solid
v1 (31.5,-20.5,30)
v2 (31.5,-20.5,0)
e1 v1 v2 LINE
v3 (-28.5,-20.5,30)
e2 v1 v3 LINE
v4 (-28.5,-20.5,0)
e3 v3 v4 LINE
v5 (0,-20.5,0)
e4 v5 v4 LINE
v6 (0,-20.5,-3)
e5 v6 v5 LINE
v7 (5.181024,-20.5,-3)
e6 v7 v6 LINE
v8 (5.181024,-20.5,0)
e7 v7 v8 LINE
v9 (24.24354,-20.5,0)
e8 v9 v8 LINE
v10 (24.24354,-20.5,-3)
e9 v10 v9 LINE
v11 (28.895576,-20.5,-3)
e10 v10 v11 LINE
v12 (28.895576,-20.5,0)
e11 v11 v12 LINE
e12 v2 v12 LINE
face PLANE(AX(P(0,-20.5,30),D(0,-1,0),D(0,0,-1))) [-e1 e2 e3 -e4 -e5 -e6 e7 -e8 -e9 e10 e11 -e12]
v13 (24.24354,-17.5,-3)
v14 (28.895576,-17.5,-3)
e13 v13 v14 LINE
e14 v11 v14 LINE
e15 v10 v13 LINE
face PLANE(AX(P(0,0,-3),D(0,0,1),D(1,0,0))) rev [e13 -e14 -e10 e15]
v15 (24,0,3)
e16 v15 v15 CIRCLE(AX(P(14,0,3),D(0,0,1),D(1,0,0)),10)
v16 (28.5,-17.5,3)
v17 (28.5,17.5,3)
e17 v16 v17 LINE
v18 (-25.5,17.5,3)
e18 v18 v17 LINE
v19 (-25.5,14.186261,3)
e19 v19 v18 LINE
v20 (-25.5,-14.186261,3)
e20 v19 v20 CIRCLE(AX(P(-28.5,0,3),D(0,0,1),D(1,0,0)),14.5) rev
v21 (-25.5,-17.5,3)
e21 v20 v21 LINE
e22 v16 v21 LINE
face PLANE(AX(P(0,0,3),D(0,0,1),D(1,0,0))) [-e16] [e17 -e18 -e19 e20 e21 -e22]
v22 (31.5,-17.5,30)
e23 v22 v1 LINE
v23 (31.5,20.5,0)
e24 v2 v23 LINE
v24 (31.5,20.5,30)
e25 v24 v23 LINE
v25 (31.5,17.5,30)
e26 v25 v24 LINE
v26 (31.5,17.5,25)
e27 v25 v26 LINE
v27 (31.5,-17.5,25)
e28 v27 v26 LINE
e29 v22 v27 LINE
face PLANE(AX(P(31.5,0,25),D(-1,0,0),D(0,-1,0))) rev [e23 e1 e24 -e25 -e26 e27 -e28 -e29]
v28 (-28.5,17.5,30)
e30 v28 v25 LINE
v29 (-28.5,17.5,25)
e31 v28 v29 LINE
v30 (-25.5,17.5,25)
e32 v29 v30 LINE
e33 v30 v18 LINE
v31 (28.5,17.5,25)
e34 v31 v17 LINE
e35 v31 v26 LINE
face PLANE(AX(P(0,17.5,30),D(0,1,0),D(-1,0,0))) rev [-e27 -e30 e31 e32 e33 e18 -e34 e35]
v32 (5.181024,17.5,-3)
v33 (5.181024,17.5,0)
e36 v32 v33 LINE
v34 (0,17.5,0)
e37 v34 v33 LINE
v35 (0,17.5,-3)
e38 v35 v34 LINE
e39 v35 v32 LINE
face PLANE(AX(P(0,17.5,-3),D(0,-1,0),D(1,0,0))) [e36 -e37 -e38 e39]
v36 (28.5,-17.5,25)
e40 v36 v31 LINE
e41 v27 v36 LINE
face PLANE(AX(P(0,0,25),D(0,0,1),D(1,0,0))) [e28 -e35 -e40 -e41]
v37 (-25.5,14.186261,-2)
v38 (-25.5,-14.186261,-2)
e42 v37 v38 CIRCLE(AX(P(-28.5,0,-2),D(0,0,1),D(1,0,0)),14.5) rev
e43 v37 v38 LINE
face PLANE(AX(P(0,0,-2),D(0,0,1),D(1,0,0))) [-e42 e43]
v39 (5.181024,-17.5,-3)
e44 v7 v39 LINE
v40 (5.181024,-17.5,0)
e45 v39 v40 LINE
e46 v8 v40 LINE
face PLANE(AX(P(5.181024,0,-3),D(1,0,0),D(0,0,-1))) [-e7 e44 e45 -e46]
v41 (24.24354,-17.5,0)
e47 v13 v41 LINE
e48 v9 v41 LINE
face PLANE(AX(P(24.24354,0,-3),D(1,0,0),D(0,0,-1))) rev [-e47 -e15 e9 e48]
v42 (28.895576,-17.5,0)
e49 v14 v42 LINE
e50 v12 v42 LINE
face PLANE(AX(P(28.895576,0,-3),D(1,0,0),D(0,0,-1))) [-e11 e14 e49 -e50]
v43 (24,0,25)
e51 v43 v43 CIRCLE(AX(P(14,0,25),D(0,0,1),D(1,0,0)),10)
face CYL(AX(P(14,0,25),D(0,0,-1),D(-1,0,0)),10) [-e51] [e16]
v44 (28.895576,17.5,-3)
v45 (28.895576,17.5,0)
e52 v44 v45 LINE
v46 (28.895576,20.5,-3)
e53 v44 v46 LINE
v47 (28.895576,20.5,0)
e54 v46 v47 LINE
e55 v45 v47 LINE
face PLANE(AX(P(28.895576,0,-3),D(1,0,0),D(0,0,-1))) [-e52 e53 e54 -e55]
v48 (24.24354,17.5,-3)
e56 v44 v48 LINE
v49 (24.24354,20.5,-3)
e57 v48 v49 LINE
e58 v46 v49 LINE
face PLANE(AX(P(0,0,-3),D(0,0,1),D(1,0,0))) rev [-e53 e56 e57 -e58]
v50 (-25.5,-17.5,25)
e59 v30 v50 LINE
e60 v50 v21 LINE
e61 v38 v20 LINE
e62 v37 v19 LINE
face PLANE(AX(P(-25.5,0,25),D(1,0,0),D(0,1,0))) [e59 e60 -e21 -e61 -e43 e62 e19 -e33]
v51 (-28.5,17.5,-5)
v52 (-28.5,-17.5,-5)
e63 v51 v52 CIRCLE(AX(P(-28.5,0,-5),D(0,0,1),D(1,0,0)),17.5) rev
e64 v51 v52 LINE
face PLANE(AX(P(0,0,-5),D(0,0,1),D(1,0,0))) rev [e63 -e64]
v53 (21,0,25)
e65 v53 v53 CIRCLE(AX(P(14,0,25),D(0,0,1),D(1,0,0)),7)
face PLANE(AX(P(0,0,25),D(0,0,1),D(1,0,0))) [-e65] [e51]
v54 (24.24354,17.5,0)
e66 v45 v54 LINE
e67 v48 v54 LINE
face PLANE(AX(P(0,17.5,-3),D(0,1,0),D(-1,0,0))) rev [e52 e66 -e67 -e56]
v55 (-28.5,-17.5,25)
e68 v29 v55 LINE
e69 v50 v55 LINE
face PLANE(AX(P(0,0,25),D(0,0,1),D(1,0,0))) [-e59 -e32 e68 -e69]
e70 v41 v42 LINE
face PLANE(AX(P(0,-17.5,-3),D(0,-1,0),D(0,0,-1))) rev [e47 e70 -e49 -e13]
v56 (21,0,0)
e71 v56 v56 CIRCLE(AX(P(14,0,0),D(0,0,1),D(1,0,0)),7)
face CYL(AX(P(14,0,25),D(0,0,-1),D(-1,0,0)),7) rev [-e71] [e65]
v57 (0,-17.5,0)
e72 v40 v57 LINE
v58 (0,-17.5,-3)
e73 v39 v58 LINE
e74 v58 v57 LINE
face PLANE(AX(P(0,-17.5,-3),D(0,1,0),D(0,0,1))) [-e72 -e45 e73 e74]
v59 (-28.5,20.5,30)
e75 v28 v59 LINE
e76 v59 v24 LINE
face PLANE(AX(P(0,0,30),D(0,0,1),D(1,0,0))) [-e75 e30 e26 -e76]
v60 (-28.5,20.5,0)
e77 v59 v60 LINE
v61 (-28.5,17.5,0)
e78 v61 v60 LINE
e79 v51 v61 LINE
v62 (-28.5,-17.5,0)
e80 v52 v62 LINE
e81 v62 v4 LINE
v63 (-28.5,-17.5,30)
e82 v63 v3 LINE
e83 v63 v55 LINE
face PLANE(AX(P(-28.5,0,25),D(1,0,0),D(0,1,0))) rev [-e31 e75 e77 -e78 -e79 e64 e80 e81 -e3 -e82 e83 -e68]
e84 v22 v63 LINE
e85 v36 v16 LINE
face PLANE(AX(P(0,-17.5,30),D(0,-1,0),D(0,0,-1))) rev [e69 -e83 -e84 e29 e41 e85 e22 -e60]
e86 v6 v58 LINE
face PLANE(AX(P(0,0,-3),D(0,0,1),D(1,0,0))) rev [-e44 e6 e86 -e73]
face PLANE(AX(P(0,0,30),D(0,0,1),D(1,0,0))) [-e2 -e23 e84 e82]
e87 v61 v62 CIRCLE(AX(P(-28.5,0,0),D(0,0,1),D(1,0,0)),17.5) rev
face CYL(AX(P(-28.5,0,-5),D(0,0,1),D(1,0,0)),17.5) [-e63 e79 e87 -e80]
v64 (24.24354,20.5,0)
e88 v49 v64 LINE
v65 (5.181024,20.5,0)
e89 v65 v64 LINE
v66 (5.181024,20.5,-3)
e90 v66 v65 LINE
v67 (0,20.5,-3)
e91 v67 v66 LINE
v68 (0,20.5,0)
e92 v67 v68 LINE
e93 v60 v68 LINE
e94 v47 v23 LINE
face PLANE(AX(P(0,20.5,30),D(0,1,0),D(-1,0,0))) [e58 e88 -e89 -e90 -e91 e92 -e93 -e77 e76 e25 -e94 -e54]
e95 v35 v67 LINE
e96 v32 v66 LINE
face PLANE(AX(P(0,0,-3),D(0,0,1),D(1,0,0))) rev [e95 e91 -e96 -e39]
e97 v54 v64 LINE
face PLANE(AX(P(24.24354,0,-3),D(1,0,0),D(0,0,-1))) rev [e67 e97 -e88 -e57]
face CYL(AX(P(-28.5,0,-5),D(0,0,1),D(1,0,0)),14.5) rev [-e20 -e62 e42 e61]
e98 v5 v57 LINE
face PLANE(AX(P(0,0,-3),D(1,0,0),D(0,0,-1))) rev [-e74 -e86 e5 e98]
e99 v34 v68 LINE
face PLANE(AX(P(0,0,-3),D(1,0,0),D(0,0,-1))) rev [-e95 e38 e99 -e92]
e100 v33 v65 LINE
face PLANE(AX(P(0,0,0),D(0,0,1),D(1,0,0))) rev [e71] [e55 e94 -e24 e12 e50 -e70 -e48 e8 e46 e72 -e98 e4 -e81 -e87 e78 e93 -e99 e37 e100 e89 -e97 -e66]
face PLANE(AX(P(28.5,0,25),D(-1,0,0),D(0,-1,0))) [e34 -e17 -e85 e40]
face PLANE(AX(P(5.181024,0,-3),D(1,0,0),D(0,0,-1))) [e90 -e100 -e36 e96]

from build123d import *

# Parameters (mm, degrees)
SKETCH1_R           = 7
BOSS_EXTRUDE1_DEPTH = 25
BOSS_EXTRUDE2_DEPTH = 5
SKETCH1_4_W         = 60
SKETCH1_4_H         = 3
BOSS_EXTRUDE3_DEPTH = 30
SKETCH1_5_W         = 5.181024341
SKETCH1_5_H         = 3
SKETCH1_5_W_2       = 4.652035809
BOSS_EXTRUDE4_DEPTH = 3
SHELL2_START        = 3
SHELL2_OUTLINE_W    = 54
SHELL2_OUTLINE_H    = 35
SHELL2_OUTLINE_R    = 10
SHELL2_DEPTH        = 22
SHELL2_START_2      = -2
SHELL2_2_DEPTH      = 5


# Read off the part's stored shape, not the designer's step: Shell2
with BuildPart() as part:
    # Sketch1 → Boss-Extrude1 (new body)
    # profile 1 of 2: a face of its own
    with BuildSketch(Plane.XY):
        with BuildLine():
            Line((-28.5, 17.5), (14, 17.5))
            Line((14, 17.5), (31.5, 17.5))
            Line((31.5, 17.5), (31.5, -17.5))
            Line((31.5, -17.5), (14, -17.5))
            Line((14, -17.5), (-28.5, -17.5))
            ThreePointArc((-28.5, -17.5), (-11, 0), (-28.5, 17.5))
        make_face()
        with Locations((14, 0)):
            Circle(SKETCH1_R, mode=Mode.SUBTRACT)
    # profile 2 of 2: a face of its own
    with BuildSketch(Plane.XY):
        with BuildLine():
            ThreePointArc((-28.5, 17.5), (-11, 0), (-28.5, -17.5))
            Line((-28.5, -17.5), (-28.5, 17.5))
        make_face()
    extrude(amount=BOSS_EXTRUDE1_DEPTH)

    # Sketch1<3> → Boss-Extrude2 (add)
    with BuildSketch(Plane.XY):
        with BuildLine():
            ThreePointArc((-28.5, 17.5), (-11, 0), (-28.5, -17.5))
            Line((-28.5, -17.5), (-28.5, 17.5))
        make_face()
    extrude(amount=-BOSS_EXTRUDE2_DEPTH)

    # Sketch1<4> → Boss-Extrude3 (add)
    with BuildSketch(Plane.XY):
        with Locations((1.5, 19)):
            Rectangle(SKETCH1_4_W, SKETCH1_4_H)
        with Locations((1.5, -19)):
            Rectangle(SKETCH1_4_W, SKETCH1_4_H)
    extrude(amount=BOSS_EXTRUDE3_DEPTH)

    # Sketch1<5> → Boss-Extrude4 (add)
    with BuildSketch(Plane.XY):
        with Locations((2.590512171, 19)):
            Rectangle(SKETCH1_5_W, SKETCH1_5_H)
        with Locations((2.590512171, -19)):
            Rectangle(SKETCH1_5_W, SKETCH1_5_H)
        with Locations((26.569558343, 19)):
            Rectangle(SKETCH1_5_W_2, SKETCH1_5_H)
        with Locations((26.569558343, -19)):
            Rectangle(SKETCH1_5_W_2, SKETCH1_5_H)
    extrude(amount=-BOSS_EXTRUDE4_DEPTH)

    # Shell2 outline → Shell2 (cut)
    with BuildSketch(Plane.XY.offset(SHELL2_START)):
        with Locations((1.5, 0)):
            Rectangle(SHELL2_OUTLINE_W, SHELL2_OUTLINE_H)
        with Locations((14, 0)):
            Circle(SHELL2_OUTLINE_R, mode=Mode.SUBTRACT)
    extrude(amount=SHELL2_DEPTH, mode=Mode.SUBTRACT)

    # Shell2 2 outline → Shell2 2 (cut)
    with BuildSketch(Plane.XY.offset(SHELL2_START_2)):
        with BuildLine():
            ThreePointArc((-25.5, -14.186260959), (-14, 0), (-25.5, 14.186260959))
            Line((-25.5, 14.186260959), (-25.5, -14.186260959))
        make_face()
    extrude(amount=SHELL2_2_DEPTH, mode=Mode.SUBTRACT)


solid = part.part
